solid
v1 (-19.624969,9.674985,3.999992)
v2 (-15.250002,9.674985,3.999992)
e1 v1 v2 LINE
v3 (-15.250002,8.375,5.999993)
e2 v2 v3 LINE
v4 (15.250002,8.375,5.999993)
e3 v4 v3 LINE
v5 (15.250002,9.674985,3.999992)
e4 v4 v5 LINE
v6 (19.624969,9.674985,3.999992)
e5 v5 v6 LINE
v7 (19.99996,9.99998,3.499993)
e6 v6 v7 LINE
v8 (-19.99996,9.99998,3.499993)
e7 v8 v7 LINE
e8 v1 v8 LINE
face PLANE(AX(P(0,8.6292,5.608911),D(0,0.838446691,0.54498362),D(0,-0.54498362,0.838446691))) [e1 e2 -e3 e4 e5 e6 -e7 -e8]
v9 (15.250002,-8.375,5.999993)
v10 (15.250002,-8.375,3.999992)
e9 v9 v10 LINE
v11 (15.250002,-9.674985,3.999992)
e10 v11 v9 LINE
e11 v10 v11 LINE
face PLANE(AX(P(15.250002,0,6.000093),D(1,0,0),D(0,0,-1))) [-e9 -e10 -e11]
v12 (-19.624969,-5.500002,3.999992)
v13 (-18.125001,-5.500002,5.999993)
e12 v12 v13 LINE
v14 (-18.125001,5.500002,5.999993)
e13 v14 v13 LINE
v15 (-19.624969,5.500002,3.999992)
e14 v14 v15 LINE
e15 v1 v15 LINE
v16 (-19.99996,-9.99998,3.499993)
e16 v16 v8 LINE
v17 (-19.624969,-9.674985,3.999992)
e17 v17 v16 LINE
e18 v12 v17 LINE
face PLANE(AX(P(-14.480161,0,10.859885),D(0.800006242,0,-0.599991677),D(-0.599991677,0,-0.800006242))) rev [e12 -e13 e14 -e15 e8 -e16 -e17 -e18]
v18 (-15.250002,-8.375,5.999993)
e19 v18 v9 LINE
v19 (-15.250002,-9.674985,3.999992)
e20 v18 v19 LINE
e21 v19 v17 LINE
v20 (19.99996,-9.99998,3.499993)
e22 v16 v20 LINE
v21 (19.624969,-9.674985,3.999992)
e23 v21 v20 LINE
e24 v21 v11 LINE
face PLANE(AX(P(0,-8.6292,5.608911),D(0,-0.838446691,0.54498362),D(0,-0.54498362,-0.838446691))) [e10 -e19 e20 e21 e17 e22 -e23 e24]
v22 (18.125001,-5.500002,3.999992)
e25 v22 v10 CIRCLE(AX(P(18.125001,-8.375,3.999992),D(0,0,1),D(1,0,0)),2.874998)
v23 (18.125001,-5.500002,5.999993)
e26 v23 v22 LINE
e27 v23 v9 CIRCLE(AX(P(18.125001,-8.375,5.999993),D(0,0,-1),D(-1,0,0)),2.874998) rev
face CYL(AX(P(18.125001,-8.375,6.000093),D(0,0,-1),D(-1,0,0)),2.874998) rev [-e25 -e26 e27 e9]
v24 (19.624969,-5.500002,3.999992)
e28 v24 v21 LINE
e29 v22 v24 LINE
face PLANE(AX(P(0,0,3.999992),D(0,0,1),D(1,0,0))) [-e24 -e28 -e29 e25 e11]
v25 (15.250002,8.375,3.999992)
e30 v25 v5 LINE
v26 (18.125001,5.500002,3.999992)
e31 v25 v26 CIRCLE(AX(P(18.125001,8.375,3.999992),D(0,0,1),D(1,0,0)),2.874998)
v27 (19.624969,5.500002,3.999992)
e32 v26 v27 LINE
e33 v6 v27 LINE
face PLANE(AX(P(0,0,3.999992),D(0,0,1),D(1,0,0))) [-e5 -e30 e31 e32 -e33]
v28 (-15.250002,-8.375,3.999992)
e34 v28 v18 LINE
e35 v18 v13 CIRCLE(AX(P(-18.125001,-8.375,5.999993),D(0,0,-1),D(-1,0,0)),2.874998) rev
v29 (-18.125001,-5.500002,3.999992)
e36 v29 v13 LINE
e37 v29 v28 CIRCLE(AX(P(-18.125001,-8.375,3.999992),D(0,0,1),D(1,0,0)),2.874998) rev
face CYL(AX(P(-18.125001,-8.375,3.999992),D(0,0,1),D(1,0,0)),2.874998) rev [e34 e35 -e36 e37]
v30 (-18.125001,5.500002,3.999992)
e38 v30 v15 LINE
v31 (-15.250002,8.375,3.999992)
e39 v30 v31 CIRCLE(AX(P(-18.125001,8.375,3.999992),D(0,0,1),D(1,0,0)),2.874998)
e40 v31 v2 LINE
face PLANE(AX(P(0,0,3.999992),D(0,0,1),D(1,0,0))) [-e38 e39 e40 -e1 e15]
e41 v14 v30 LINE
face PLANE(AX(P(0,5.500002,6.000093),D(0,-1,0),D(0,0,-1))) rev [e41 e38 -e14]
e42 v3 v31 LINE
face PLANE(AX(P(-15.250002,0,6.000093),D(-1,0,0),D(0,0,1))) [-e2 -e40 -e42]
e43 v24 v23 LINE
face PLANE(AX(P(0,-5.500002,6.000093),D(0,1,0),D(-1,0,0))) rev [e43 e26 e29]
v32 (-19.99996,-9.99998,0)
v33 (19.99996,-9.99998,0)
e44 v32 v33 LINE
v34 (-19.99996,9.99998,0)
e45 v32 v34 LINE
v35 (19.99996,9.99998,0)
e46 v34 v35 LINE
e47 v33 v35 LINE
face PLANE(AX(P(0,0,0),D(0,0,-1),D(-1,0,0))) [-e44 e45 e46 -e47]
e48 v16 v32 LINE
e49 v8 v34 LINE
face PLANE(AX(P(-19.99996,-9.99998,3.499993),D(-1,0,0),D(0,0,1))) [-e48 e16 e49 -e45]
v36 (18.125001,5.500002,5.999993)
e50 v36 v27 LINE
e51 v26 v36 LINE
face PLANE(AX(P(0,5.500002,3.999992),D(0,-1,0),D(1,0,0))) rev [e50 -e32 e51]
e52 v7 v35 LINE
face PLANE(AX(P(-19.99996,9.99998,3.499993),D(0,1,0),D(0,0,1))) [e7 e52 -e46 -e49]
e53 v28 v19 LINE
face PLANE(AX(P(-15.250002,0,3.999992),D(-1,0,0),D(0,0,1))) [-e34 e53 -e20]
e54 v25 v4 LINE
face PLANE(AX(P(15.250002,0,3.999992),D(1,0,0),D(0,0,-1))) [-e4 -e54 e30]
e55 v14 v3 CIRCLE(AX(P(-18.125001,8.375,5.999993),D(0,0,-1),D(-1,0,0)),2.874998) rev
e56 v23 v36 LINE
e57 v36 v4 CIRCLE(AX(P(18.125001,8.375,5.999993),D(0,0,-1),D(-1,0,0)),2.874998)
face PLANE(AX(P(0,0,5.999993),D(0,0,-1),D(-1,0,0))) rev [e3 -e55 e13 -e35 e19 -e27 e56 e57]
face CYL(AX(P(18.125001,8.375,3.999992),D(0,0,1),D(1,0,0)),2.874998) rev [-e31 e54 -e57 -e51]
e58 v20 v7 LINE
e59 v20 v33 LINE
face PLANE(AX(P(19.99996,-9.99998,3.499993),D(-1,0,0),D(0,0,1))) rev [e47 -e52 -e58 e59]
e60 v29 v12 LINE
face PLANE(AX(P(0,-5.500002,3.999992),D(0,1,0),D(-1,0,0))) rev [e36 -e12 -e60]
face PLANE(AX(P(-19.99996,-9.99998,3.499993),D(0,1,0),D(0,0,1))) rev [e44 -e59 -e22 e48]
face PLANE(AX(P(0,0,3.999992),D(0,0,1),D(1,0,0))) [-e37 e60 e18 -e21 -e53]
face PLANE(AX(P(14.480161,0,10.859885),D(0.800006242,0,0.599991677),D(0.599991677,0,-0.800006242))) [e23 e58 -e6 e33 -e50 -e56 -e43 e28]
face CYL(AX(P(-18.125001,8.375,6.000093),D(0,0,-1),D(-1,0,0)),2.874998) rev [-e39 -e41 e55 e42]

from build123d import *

# Parameters (mm, degrees)
SKETCH1_W           = 39.99992
SKETCH1_H           = 19.99996
BOSS_EXTRUDE1_DEPTH = 3.499993
CUT_EXTRUDE1_START  = -2.00000108
CUT_EXTRUDE1_DEPTH  = 2.00000108


# Read off the part's stored shape, not the designer's step: Cut-Extrude1
with BuildPart() as part:
    # Sketch1 → Boss-Extrude1 (new body)
    with BuildSketch(Plane.XY):
        Rectangle(SKETCH1_W, SKETCH1_H)
    extrude(amount=BOSS_EXTRUDE1_DEPTH)

    # Sketch3 → section 0 of loft1
    with BuildSketch(Plane.XY.offset(5.99999308), mode=Mode.PRIVATE) as loft1_s0:
        with BuildLine():
            Line((-18.12500058, -8.375000014), (18.12500058, -8.375000014))
            Line((18.12500058, -8.375000014), (18.12500058, 8.375000014))
            Line((18.12500058, 8.375000014), (-18.12500058, 8.375000014))
            Line((-18.12500058, 8.375000014), (-18.12500058, -8.375000014))
        make_face()
    # loft up to a face of the part (loft1)
    loft([loft1_s0.sketch, part.faces().sort_by_distance((0, 0, 3.499993))[0]])

    # Cut-Extrude1 outline → Cut-Extrude1 (cut)
    with BuildSketch(Plane.XY.offset(5.99999308).offset(CUT_EXTRUDE1_START)):
        with BuildLine():
            ThreePointArc((-15.250002266, -8.375000014), (-16.092069776, -6.34206921), (-18.12500058, -5.5000017))
            Line((-18.12500058, -5.5000017), (-19.99996, -5.5000017))
            Line((-19.99996, -5.5000017), (-19.99996, -9.99998))
            Line((-19.99996, -9.99998), (-15.250002266, -9.99998))
            Line((-15.250002266, -9.99998), (-15.250002266, -8.375000014))
        make_face()
        with BuildLine():
            ThreePointArc((18.12500058, -5.5000017), (16.092069776, -6.34206921), (15.250002266, -8.375000014))
            Line((15.250002266, -8.375000014), (15.250002266, -9.99998))
            Line((15.250002266, -9.99998), (19.99996, -9.99998))
            Line((19.99996, -9.99998), (19.99996, -5.5000017))
            Line((19.99996, -5.5000017), (18.12500058, -5.5000017))
        make_face()
        with BuildLine():
            ThreePointArc((-18.12500058, 5.5000017), (-16.092069776, 6.34206921), (-15.250002266, 8.375000014))
            Line((-15.250002266, 8.375000014), (-15.250002266, 9.99998))
            Line((-15.250002266, 9.99998), (-19.99996, 9.99998))
            Line((-19.99996, 9.99998), (-19.99996, 5.5000017))
            Line((-19.99996, 5.5000017), (-18.12500058, 5.5000017))
        make_face()
        with BuildLine():
            ThreePointArc((15.250002266, 8.375000014), (16.092069776, 6.34206921), (18.12500058, 5.5000017))
            Line((18.12500058, 5.5000017), (19.99996, 5.5000017))
            Line((19.99996, 5.5000017), (19.99996, 9.99998))
            Line((19.99996, 9.99998), (15.250002266, 9.99998))
            Line((15.250002266, 9.99998), (15.250002266, 8.375000014))
        make_face()
    extrude(amount=CUT_EXTRUDE1_DEPTH, mode=Mode.SUBTRACT)


solid = part.part
